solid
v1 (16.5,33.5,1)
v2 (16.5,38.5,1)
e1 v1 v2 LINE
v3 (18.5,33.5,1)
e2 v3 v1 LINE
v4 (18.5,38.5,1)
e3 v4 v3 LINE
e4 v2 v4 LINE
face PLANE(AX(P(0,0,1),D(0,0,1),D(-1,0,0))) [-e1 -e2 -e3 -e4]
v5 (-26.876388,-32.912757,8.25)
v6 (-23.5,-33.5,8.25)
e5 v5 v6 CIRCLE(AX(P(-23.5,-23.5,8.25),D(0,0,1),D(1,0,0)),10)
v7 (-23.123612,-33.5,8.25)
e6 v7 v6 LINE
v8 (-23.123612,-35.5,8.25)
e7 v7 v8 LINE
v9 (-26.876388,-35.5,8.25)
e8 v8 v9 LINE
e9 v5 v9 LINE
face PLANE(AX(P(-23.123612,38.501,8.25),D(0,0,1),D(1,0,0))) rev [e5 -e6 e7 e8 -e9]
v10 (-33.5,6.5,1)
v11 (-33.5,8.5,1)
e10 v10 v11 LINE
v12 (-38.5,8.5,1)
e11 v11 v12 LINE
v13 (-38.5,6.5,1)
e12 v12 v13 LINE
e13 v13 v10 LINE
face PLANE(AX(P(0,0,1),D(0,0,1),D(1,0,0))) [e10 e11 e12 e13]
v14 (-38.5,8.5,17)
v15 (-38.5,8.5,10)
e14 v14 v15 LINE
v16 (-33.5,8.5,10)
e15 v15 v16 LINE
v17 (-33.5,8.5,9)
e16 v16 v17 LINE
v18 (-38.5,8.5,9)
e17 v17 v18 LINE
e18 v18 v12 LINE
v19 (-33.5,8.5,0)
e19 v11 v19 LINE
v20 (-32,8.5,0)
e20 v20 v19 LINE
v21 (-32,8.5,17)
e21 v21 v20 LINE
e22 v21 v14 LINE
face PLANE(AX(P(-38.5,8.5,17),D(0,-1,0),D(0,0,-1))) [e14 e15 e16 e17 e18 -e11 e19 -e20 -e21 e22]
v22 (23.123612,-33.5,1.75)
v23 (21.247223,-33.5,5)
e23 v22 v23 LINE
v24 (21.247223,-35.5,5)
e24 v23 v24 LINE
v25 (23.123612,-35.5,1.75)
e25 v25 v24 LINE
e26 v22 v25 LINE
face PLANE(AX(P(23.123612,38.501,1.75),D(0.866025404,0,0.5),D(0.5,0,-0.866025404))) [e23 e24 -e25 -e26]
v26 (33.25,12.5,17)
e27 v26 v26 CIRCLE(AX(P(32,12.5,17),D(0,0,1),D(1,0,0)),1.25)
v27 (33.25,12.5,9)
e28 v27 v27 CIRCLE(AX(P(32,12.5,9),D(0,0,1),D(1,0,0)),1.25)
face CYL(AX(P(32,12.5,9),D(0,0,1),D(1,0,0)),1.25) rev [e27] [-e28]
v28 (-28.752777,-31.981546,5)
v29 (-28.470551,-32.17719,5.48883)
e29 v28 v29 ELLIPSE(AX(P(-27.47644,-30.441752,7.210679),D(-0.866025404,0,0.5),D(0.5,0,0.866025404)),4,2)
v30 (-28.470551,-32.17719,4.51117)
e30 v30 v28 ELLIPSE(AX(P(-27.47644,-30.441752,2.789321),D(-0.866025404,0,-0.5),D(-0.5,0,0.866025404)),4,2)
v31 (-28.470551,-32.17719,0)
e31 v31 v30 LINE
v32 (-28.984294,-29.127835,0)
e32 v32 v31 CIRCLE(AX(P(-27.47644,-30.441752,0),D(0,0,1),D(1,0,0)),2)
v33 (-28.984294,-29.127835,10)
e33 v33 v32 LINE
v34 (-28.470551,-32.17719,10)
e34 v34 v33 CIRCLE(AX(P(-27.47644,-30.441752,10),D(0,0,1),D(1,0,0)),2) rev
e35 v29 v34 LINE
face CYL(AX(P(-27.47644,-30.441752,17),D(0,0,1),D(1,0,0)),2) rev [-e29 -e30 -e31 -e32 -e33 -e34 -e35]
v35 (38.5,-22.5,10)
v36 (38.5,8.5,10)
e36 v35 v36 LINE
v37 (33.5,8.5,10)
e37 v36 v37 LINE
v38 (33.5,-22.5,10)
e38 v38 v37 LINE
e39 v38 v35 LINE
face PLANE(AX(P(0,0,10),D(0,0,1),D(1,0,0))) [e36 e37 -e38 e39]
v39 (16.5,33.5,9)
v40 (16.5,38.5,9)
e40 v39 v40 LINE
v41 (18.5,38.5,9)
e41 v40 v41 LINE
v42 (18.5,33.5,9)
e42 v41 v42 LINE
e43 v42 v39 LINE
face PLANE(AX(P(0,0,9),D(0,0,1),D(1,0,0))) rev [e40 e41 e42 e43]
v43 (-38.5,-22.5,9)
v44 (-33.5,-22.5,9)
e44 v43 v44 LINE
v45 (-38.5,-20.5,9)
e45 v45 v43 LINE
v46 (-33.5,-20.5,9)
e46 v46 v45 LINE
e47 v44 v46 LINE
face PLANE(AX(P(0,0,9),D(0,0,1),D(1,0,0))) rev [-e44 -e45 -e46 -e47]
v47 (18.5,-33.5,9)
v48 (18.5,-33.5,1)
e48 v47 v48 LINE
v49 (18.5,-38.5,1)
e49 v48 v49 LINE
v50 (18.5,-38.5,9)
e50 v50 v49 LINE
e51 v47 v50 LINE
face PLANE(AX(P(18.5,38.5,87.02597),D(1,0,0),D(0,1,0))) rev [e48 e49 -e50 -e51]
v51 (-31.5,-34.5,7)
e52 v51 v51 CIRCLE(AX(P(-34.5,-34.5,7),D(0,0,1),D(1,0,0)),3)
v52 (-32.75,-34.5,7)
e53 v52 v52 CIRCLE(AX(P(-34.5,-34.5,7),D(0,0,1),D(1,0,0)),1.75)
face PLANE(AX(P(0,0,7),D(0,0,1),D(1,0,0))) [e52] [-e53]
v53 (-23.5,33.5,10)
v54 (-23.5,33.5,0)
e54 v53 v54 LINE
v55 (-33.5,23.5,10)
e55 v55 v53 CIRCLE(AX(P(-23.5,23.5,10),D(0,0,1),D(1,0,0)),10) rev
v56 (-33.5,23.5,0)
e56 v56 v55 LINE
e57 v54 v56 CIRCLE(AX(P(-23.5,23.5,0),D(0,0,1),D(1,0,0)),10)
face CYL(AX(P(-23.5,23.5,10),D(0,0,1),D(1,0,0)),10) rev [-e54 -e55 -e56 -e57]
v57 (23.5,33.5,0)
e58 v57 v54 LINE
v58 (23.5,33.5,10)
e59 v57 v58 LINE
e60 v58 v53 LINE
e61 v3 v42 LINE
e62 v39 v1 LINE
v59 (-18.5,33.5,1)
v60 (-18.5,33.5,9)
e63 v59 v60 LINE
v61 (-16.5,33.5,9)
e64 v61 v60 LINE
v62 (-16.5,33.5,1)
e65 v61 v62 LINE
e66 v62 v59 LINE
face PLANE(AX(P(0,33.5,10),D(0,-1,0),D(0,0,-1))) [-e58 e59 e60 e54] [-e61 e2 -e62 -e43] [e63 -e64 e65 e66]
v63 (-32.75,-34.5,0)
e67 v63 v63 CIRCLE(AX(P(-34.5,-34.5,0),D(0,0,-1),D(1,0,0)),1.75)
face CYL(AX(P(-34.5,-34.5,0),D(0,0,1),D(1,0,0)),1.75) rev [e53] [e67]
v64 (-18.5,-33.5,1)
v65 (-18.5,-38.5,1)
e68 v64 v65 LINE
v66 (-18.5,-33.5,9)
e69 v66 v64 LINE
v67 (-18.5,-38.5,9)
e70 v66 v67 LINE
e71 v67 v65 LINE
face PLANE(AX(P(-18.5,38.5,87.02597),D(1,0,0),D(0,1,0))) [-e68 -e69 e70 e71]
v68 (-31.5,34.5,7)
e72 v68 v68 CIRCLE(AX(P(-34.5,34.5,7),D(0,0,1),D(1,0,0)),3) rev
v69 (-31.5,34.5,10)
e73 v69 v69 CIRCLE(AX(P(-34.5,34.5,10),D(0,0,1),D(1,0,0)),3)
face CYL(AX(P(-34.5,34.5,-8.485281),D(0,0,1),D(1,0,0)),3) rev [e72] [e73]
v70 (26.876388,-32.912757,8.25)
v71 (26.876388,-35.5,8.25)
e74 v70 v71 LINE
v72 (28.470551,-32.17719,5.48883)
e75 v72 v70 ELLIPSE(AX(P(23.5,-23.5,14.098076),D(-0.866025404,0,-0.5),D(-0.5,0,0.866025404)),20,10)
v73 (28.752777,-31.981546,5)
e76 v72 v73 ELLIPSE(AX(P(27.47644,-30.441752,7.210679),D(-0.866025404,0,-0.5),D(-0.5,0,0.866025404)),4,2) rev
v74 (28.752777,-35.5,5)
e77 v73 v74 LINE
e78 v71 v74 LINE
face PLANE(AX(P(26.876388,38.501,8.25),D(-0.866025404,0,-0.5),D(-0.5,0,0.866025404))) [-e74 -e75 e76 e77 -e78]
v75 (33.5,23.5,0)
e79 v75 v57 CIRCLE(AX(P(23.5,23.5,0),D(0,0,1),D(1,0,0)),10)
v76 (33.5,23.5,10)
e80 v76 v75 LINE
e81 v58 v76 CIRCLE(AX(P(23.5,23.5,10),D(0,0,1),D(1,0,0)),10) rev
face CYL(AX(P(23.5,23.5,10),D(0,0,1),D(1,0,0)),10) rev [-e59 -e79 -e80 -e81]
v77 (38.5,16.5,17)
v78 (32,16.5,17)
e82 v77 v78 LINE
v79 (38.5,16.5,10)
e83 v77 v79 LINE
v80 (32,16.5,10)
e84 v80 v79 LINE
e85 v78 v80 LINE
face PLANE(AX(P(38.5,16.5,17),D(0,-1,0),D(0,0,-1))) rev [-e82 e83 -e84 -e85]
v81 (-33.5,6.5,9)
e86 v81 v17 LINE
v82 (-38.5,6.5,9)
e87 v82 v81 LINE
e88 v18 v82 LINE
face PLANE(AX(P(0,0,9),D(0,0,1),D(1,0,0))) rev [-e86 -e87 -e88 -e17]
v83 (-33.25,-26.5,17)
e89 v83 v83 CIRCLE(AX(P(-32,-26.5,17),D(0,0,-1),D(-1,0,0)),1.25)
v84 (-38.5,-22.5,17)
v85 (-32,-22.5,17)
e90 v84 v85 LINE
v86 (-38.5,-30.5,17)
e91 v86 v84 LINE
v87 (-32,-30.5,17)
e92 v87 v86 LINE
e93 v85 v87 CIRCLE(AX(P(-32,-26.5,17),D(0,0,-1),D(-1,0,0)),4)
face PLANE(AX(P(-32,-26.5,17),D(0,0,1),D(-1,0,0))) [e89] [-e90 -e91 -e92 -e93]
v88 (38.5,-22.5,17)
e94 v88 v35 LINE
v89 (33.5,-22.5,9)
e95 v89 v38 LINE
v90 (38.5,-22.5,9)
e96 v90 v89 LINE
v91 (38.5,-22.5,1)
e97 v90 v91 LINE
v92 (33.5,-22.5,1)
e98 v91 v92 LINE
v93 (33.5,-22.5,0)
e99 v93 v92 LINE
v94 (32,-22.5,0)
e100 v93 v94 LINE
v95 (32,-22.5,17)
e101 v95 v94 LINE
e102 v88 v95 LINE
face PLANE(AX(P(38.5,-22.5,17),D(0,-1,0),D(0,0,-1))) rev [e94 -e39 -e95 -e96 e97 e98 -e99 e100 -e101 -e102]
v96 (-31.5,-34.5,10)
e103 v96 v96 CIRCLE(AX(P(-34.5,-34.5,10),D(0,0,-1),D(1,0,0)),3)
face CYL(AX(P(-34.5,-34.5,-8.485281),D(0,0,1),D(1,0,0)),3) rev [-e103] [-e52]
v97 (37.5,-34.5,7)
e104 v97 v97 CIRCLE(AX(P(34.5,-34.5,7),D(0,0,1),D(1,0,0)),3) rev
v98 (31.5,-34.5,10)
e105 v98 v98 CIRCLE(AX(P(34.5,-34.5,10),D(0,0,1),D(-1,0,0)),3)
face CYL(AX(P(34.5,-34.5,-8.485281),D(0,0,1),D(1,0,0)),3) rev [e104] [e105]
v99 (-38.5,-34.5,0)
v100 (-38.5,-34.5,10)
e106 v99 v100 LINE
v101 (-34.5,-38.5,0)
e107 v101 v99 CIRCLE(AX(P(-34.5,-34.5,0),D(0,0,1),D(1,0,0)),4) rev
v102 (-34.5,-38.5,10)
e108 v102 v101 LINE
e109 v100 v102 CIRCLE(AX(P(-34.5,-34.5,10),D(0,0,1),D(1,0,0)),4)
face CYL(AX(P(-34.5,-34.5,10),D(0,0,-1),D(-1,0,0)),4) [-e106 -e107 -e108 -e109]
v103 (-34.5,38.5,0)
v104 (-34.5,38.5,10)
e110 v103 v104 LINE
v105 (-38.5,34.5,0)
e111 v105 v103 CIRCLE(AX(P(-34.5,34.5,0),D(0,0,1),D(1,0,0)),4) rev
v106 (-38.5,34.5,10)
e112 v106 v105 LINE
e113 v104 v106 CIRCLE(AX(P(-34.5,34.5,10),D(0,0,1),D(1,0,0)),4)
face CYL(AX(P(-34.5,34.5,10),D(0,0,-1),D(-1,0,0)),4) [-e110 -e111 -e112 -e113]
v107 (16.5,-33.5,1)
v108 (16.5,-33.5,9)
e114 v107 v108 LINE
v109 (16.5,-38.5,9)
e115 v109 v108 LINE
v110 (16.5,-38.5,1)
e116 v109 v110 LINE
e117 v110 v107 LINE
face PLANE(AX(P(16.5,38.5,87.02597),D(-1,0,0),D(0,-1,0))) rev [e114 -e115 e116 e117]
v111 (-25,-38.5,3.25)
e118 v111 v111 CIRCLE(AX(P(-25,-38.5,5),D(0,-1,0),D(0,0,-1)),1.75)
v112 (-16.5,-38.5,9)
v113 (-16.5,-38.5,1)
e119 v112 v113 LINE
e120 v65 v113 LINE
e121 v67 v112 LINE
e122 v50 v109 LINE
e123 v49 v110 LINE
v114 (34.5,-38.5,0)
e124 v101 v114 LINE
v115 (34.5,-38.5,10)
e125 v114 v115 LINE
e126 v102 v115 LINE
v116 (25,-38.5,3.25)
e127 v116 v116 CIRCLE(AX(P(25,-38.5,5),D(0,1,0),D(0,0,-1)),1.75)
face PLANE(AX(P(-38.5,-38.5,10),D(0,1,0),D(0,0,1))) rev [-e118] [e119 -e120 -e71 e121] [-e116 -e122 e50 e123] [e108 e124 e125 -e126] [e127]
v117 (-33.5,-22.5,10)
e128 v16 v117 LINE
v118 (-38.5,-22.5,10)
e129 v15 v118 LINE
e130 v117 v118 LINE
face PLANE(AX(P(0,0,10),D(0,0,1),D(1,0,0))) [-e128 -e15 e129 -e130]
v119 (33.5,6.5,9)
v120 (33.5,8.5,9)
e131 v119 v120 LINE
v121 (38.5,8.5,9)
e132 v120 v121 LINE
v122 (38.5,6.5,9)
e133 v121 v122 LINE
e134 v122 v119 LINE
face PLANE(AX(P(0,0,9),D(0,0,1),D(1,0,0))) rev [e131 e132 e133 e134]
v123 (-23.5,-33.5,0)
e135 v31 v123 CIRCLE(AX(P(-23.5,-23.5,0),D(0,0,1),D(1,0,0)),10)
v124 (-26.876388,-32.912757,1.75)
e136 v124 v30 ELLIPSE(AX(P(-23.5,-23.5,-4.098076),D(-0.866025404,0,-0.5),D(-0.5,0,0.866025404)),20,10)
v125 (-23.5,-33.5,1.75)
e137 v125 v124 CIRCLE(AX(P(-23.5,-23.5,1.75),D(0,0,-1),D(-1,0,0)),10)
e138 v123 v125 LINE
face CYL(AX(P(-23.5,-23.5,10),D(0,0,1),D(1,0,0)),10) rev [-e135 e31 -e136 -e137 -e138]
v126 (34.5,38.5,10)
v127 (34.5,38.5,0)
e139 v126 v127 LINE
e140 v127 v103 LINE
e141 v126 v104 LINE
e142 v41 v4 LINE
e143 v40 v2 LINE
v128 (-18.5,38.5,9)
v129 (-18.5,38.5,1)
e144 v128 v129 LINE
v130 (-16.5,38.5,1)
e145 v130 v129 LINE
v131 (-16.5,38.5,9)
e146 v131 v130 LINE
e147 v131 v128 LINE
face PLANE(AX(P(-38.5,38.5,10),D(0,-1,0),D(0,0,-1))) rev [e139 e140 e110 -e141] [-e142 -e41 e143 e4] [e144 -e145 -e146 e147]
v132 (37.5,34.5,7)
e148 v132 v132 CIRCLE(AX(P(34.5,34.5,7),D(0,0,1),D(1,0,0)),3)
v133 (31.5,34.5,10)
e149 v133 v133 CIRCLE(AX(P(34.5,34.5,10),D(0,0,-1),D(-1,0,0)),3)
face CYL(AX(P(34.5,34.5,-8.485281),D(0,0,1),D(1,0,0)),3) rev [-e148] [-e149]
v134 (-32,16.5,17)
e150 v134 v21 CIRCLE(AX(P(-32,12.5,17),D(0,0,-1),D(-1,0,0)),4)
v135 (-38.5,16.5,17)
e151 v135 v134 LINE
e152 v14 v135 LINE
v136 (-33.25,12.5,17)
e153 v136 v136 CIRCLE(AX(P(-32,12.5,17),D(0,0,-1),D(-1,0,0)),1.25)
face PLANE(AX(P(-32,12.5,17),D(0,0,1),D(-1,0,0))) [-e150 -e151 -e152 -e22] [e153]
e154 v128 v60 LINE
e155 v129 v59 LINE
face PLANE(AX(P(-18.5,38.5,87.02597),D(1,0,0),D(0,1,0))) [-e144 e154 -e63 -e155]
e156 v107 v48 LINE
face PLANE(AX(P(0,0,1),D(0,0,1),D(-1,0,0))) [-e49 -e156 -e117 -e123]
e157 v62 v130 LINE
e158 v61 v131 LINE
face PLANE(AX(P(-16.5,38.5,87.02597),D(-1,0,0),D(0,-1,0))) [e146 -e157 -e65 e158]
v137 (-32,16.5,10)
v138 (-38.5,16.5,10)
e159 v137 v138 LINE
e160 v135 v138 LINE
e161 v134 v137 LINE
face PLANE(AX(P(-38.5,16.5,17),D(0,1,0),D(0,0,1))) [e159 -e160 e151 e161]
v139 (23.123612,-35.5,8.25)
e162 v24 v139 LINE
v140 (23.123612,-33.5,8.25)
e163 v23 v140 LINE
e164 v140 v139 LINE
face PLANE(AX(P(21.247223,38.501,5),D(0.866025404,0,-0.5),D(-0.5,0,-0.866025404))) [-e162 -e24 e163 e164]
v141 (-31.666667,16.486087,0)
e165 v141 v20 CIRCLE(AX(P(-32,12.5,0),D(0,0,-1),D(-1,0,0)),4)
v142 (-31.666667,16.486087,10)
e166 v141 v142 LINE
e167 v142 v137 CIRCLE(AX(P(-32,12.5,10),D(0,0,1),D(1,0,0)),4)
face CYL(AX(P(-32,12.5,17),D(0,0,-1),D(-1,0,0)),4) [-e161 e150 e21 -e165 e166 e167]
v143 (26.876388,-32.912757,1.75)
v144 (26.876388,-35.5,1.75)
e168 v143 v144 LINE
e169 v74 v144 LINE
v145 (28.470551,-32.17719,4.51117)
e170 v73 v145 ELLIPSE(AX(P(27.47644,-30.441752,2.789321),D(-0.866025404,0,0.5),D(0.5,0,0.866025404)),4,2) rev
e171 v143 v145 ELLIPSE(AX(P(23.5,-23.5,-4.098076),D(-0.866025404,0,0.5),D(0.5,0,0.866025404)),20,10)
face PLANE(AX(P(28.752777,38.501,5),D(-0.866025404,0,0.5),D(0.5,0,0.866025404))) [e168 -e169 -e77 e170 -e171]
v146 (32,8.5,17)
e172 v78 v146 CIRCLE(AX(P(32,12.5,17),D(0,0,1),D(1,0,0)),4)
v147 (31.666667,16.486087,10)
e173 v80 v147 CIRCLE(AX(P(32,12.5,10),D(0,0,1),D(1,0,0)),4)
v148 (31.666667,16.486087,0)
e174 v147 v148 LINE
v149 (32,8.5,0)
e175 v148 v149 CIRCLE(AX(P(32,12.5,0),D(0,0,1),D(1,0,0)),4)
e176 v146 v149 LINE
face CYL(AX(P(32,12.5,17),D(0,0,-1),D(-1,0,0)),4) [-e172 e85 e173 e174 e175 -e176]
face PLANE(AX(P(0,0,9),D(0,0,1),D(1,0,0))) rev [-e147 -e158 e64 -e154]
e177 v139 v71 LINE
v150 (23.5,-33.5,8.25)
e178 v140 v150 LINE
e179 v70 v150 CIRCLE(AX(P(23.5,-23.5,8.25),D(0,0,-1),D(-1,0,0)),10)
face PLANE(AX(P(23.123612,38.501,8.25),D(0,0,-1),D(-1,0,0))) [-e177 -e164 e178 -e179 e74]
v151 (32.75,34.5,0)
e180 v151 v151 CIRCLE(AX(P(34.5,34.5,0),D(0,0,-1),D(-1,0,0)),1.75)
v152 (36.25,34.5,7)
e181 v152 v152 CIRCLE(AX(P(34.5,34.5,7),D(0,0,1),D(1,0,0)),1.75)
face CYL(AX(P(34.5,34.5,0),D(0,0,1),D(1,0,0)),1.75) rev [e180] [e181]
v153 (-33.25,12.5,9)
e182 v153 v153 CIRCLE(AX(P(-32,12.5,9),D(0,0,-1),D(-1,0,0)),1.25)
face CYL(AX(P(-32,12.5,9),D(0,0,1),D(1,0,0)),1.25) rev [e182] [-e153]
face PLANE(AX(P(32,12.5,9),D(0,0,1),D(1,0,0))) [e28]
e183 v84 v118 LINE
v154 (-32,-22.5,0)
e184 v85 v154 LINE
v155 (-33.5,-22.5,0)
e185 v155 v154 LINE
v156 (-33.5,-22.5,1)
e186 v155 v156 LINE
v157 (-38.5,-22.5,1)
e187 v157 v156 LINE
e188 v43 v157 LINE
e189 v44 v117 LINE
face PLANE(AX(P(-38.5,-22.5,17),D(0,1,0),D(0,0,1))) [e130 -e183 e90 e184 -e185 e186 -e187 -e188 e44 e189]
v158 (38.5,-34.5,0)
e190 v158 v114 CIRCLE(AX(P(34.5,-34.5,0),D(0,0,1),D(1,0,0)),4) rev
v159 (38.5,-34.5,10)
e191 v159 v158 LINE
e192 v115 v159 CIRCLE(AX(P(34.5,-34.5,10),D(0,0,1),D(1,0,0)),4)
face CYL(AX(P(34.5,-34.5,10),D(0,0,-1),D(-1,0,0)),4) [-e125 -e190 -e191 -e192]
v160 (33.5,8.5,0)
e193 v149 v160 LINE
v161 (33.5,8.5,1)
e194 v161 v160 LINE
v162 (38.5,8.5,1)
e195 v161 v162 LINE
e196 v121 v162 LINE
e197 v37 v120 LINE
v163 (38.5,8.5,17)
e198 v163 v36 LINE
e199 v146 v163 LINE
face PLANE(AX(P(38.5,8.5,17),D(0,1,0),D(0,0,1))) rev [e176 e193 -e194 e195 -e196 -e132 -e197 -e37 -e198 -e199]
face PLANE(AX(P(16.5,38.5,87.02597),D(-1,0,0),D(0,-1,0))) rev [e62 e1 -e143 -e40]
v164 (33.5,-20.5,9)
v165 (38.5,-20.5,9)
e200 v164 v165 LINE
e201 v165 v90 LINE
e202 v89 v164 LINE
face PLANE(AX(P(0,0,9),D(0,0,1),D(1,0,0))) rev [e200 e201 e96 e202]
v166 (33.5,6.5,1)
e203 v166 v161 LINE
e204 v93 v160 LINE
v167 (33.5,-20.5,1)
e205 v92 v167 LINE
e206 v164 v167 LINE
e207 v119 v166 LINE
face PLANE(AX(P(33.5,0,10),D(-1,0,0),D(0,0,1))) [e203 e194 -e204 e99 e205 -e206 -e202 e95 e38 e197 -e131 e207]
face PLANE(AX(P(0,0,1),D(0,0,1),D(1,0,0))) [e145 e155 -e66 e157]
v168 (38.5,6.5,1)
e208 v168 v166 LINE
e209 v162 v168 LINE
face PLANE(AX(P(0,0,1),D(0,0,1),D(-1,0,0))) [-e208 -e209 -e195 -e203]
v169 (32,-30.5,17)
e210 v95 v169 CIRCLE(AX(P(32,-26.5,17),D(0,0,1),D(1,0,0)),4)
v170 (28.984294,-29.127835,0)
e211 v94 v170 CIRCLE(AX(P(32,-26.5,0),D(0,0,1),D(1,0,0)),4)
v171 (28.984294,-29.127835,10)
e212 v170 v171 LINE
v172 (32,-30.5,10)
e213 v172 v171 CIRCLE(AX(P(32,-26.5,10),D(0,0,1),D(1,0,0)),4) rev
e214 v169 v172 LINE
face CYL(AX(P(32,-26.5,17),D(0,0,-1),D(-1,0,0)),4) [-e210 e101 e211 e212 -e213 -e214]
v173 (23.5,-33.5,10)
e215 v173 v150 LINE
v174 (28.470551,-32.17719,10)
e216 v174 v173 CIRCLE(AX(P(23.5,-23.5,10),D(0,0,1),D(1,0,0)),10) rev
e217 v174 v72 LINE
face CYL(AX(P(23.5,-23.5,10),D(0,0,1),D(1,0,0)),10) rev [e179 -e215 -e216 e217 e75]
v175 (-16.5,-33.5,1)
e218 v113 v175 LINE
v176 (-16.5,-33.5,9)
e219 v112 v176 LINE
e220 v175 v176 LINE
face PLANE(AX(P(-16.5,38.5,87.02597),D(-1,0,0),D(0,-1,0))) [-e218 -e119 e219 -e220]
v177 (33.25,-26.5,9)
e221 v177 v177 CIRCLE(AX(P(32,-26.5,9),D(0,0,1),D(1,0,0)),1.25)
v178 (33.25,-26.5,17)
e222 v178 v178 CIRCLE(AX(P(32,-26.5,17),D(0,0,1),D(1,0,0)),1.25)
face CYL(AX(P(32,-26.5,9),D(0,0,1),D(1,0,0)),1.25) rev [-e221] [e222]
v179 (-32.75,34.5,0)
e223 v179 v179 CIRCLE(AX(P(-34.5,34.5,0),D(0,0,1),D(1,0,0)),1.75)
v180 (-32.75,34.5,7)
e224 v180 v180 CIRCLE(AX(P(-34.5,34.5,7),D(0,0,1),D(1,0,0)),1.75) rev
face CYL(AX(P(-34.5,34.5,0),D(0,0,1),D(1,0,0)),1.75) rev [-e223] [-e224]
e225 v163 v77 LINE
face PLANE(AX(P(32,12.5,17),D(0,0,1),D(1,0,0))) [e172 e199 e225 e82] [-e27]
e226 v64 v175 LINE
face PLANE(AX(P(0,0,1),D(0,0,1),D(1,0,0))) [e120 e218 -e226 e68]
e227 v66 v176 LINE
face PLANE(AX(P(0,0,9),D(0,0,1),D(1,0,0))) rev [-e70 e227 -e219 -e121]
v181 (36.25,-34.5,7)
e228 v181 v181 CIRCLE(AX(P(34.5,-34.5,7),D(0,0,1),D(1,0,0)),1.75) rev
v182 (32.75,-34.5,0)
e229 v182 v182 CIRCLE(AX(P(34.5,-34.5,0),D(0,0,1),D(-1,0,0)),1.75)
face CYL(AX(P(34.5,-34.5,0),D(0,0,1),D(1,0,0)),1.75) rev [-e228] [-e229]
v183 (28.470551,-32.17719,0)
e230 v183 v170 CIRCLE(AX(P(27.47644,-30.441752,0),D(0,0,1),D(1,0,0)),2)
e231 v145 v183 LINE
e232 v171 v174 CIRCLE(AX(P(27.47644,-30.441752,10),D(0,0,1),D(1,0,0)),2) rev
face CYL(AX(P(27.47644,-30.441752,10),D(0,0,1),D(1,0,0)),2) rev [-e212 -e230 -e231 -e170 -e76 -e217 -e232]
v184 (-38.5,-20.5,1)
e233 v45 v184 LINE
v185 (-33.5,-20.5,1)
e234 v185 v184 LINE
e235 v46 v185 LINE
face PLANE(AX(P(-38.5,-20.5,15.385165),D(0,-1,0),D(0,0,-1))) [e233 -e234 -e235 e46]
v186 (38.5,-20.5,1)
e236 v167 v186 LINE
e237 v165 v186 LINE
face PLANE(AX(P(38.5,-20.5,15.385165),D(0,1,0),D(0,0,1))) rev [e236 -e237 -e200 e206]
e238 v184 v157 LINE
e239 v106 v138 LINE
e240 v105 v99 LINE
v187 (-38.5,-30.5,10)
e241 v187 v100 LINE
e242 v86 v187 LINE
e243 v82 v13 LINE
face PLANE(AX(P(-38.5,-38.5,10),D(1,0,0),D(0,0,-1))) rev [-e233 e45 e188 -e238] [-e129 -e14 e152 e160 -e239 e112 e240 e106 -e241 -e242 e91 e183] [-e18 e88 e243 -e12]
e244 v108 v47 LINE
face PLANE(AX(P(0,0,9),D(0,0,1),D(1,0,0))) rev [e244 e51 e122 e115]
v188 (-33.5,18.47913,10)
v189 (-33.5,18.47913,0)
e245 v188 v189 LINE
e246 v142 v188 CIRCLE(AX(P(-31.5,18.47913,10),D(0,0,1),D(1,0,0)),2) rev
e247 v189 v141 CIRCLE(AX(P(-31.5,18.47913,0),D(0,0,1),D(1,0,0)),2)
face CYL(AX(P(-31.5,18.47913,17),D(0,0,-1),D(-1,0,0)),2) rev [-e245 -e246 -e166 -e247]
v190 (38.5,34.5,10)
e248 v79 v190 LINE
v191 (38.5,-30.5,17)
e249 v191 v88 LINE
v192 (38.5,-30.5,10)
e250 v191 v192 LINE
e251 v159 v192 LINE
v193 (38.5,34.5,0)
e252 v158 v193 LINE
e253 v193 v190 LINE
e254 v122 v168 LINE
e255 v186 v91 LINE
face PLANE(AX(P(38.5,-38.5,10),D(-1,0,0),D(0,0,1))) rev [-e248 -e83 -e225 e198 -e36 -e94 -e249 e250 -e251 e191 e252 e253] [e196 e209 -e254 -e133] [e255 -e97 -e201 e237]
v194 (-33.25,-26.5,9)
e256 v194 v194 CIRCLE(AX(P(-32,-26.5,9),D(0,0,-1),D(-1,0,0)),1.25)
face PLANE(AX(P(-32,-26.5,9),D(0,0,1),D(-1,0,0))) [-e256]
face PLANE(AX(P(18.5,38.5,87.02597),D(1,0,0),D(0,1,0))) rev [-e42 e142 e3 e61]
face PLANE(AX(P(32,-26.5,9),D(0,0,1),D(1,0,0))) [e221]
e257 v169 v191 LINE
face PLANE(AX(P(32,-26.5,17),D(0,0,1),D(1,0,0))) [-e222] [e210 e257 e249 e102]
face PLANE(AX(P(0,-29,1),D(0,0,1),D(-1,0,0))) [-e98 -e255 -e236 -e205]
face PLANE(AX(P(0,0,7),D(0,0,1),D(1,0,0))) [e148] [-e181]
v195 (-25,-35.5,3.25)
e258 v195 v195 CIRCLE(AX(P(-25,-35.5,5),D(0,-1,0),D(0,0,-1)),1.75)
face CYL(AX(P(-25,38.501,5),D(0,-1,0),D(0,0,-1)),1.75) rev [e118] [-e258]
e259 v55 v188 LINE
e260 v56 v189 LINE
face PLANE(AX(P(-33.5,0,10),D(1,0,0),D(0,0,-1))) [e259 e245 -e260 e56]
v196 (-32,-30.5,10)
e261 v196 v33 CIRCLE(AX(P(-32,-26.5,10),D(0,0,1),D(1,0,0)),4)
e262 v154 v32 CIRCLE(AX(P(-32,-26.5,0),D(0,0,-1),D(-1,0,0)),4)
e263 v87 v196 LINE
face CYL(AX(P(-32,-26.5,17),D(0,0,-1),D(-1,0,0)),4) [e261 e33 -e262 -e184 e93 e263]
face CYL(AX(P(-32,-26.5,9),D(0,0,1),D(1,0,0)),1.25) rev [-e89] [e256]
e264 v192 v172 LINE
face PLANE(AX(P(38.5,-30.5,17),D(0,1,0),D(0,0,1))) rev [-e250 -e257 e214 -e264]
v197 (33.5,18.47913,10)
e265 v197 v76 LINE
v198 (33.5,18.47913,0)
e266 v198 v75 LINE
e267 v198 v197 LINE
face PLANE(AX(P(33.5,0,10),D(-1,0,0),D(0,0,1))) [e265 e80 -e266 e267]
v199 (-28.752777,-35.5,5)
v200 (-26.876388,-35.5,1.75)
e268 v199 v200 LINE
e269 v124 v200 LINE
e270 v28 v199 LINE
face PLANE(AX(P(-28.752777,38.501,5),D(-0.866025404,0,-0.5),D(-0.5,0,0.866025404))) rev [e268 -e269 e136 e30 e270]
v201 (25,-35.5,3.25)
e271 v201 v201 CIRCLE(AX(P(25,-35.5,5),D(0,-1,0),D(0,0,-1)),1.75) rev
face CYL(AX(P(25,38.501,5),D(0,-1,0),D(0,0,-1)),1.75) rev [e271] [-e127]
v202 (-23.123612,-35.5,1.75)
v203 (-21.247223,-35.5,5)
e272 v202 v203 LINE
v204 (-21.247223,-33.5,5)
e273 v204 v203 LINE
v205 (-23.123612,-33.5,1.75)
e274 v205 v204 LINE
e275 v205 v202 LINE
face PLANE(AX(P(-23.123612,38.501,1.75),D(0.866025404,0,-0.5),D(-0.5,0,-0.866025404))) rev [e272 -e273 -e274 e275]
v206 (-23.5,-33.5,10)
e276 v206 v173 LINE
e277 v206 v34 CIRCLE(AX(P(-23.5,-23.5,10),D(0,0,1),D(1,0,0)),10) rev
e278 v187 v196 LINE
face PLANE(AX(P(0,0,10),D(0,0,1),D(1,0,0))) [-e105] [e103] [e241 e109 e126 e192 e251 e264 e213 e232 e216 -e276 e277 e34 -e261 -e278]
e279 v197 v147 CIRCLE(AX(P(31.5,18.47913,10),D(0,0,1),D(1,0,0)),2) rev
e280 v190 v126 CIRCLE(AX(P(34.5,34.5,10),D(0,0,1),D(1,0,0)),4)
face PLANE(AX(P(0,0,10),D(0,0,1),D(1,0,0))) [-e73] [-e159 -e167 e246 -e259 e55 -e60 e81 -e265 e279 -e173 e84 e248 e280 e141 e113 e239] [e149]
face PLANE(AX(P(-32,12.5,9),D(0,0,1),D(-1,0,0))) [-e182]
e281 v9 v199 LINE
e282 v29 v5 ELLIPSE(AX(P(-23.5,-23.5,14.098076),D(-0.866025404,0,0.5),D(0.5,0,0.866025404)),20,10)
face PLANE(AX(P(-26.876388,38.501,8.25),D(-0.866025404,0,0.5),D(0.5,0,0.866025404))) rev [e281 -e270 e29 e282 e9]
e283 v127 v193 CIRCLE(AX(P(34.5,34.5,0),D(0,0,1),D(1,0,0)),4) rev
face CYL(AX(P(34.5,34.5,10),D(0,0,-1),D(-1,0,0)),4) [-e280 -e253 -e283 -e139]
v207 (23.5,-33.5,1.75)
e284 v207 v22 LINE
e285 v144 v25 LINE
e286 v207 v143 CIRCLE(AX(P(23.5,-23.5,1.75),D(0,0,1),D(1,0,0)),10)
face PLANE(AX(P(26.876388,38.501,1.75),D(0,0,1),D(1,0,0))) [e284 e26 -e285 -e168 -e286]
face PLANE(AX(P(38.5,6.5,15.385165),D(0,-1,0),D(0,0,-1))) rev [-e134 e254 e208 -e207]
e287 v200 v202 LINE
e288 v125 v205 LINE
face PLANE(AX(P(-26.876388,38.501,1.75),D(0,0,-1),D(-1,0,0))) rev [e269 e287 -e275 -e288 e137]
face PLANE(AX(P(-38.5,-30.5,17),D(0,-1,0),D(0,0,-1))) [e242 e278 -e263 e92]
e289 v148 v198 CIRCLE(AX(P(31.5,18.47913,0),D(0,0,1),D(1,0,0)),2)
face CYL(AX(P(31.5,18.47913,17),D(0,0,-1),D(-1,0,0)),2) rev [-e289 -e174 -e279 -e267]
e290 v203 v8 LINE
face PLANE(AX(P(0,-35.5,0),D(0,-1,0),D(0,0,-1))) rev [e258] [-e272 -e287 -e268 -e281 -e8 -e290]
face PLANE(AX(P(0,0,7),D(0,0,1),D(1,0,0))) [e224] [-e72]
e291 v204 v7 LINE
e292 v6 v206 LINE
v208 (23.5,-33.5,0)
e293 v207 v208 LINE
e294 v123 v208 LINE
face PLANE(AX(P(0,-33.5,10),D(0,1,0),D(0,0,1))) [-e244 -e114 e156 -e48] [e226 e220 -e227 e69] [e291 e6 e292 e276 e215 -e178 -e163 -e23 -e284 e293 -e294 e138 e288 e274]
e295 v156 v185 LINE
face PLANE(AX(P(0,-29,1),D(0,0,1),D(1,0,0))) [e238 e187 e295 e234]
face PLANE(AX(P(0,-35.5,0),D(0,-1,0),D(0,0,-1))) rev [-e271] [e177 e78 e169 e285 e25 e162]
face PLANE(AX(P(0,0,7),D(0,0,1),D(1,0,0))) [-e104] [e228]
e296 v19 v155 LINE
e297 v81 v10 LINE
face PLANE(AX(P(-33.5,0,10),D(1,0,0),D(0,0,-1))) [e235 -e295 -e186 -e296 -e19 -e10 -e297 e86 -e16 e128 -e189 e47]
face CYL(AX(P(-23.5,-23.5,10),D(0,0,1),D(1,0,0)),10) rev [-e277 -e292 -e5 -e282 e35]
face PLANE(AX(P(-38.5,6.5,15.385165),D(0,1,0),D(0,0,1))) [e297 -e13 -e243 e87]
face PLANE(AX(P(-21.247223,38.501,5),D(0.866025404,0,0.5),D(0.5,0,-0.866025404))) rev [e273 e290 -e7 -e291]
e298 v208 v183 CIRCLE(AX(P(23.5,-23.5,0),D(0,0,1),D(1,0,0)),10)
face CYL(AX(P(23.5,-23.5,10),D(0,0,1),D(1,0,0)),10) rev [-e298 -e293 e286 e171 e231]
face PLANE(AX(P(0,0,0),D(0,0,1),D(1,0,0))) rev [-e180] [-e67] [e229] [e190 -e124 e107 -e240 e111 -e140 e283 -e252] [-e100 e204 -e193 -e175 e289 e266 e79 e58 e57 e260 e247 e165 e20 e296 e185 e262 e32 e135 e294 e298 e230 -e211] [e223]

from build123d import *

# Parameters (mm, degrees)
SKETCH1_W               = 77
SKETCH1_H               = 77
SKETCH1_W_2             = 67
SKETCH1_H_2             = 67
EXTRUDE_THIN1_DEPTH     = 10
FILLET2_R               = 10
FILLET1_R               = 4
SKETCH2_R               = 1.7500000000000038
CUT_EXTRUDE1_DEPTH      = 56.35792626173781
SKETCH3_R               = 3.0000000000000018
CUT_EXTRUDE2_DEPTH      = 3
MIRROR2_COPY_1_SKETCH_R = 1.7500000000000038
MIRROR2_COPY_1_DEPTH    = 56.35792626173781
MIRROR2_COPY_2_SKETCH_R = 3.0000000000000018
MIRROR2_COPY_2_DEPTH    = 3
BOSS_EXTRUDE2_DEPTH     = 17
SKETCH5_R               = 1.2499999999999978
CUT_EXTRUDE3_DEPTH      = 8
LPATTERN1_COUNT         = 2
LPATTERN1_PITCH         = 39
MIRROR3_COPY_1_DEPTH    = 17
MIRROR3_COPY_2_SKETCH_R = 1.2499999999999978
MIRROR3_COPY_2_DEPTH    = 8
CUT_EXTRUDE6_REACH      = 89.751
SKETCH9_R               = 1.7500000000000002
CUT_EXTRUDE7_REACH      = 92.751
CUT_EXTRUDE7_START      = -3
CUT_EXTRUDE8_START      = 1
SKETCH11_W              = 4.999999999999986
SKETCH11_H              = 1.9999999999999991
CUT_EXTRUDE8_DEPTH      = 8
LPATTERN2_COUNT         = 2
LPATTERN2_PITCH         = 29
MIRROR5_START           = 1
MIRROR5_COPY_1_SKETCH_W = 4.999999999999986
MIRROR5_COPY_1_SKETCH_H = 1.9999999999999991
MIRROR5_COPY_1_DEPTH    = 8
CUT_EXTRUDE9_START      = 1
CUT_EXTRUDE9_DEPTH      = 8
FILLET3_R               = 2
FILLET4_R               = 2


with BuildPart() as part:
    # Sketch1 → Extrude-Thin1 (new body)
    with BuildSketch(Plane.XY):
        Rectangle(SKETCH1_W, SKETCH1_H)
        Rectangle(SKETCH1_W_2, SKETCH1_H_2, mode=Mode.SUBTRACT)
    extrude(amount=EXTRUDE_THIN1_DEPTH)

    # Fillet2
    fillet2_edges = [part.edges().sort_by_distance(p)[0] for p in [
        (33.49999999999999, -33.50000000000001, 5),
        (33.49999999999999, 33.49999999999999, 5),
        (-33.50000000000001, 33.49999999999999, 5),
        (-33.50000000000001, -33.50000000000001, 5),
    ]]
    fillet(fillet2_edges, radius=FILLET2_R)

    # Fillet1
    fillet1_edges = [part.edges().sort_by_distance(p)[0] for p in [
        (38.49999999999999, -38.50000000000001, 5),
        (-38.50000000000001, -38.50000000000001, 5),
        (-38.50000000000001, 38.49999999999999, 5),
        (38.49999999999999, 38.49999999999999, 5),
    ]]
    fillet(fillet1_edges, radius=FILLET1_R)

    # Sketch2 → Cut-Extrude1 (cut, through all)
    with BuildSketch(Plane.XY.offset(10)):
        with Locations((-34.5, 34.499999999999986)):
            Circle(SKETCH2_R)
    cut_extrude1 = extrude(amount=-CUT_EXTRUDE1_DEPTH, mode=Mode.SUBTRACT)

    # Sketch3 → Cut-Extrude2 (cut)
    with BuildSketch(Plane.XY.offset(10)):
        with Locations((-34.5, 34.499999999999986)):
            Circle(SKETCH3_R)
    cut_extrude2 = extrude(amount=-CUT_EXTRUDE2_DEPTH, mode=Mode.SUBTRACT)

    # Mirror1: Cut-Extrude1, Cut-Extrude2 across plane
    add(cut_extrude1.mirror(Plane(origin=(0, 0, 0), x_dir=(0, 0, 1), z_dir=(1, 0, 0))), mode=Mode.SUBTRACT)
    add(cut_extrude2.mirror(Plane(origin=(0, 0, 0), x_dir=(0, 0, 1), z_dir=(1, 0, 0))), mode=Mode.SUBTRACT)

    # Mirror2: Cut-Extrude1, Cut-Extrude2 across plane
    add(cut_extrude1.mirror(Plane.ZX), mode=Mode.SUBTRACT)
    add(cut_extrude2.mirror(Plane.ZX), mode=Mode.SUBTRACT)

    # Mirror2 copy 1 sketch → Mirror2 copy 1 (cut, through all)
    with BuildSketch(Plane(origin=(0, 0, 10), x_dir=(-1, 0, 0), z_dir=(0, 0, 1))):
        with Locations((-34.5, 34.499999999999986)):
            Circle(MIRROR2_COPY_1_SKETCH_R)
    extrude(amount=-MIRROR2_COPY_1_DEPTH, mode=Mode.SUBTRACT)

    # Mirror2 copy 2 sketch → Mirror2 copy 2 (cut)
    with BuildSketch(Plane(origin=(0, 0, 10), x_dir=(-1, 0, 0), z_dir=(0, 0, 1))):
        with Locations((-34.5, 34.499999999999986)):
            Circle(MIRROR2_COPY_2_SKETCH_R)
    extrude(amount=-MIRROR2_COPY_2_DEPTH, mode=Mode.SUBTRACT)

    # Sketch4 → Boss-Extrude2 (add)
    with BuildSketch(Plane.XY):
        with BuildLine():
            Line((38.49999999999999, -30.500000000000007), (32, -30.500000000000007))
            ThreePointArc((32, -30.500000000000007), (28, -26.500000000000007), (32, -22.500000000000007))
            Line((32, -22.500000000000007), (38.49999999999999, -22.500000000000007))
            Line((38.49999999999999, -22.500000000000007), (38.49999999999999, -30.500000000000007))
        make_face()
    boss_extrude2 = extrude(amount=BOSS_EXTRUDE2_DEPTH)

    # Sketch5 → Cut-Extrude3 (cut)
    with BuildSketch(Plane.XY.offset(17)):
        with Locations((32, -26.500000000000007)):
            Circle(SKETCH5_R)
    cut_extrude3 = extrude(amount=-CUT_EXTRUDE3_DEPTH, mode=Mode.SUBTRACT)

    # LPattern1: Boss-Extrude2, Cut-Extrude3 ×2
    with Locations(*[(0, i * LPATTERN1_PITCH, 0) for i in range(1, LPATTERN1_COUNT)]):
        add(boss_extrude2)
        add(cut_extrude3, mode=Mode.SUBTRACT)

    # Mirror3: Boss-Extrude2, Cut-Extrude3 across plane
    add(boss_extrude2.mirror(Plane(origin=(0, 0, 0), x_dir=(0, 0, 1), z_dir=(1, 0, 0))))
    add(cut_extrude3.mirror(Plane(origin=(0, 0, 0), x_dir=(0, 0, 1), z_dir=(1, 0, 0))), mode=Mode.SUBTRACT)

    # Mirror3 copy 1 sketch → Mirror3 copy 1 (add)
    with BuildSketch(Plane(origin=(0, 39, 0), x_dir=(-1, 0, 0), z_dir=(0, 0, 1))):
        with BuildLine():
            Line((38.49999999999999, 30.500000000000007), (32, 30.500000000000007))
            ThreePointArc((32, 30.500000000000007), (28, 26.500000000000007), (32, 22.500000000000007))
            Line((32, 22.500000000000007), (38.49999999999999, 22.500000000000007))
            Line((38.49999999999999, 22.500000000000007), (38.49999999999999, 30.500000000000007))
        make_face()
    extrude(amount=MIRROR3_COPY_1_DEPTH)

    # Mirror3 copy 2 sketch → Mirror3 copy 2 (cut)
    with BuildSketch(Plane(origin=(0, 39, 17), x_dir=(-1, 0, 0), z_dir=(0, 0, 1))):
        with Locations((32, 26.500000000000007)):
            Circle(MIRROR3_COPY_2_SKETCH_R)
    extrude(amount=-MIRROR3_COPY_2_DEPTH, mode=Mode.SUBTRACT)

    # Sketch9 → Cut-Extrude6 (cut, up to next)
    with BuildSketch(Plane.XZ.offset(38.50000000000001), mode=Mode.PRIVATE) as cut_extrude6_sk1:
        with Locations(Location((-25, 5.000000000000001, 0), (0, 0, 270))):
            Circle(SKETCH9_R)
    cut_extrude6_tool1 = extrude(cut_extrude6_sk1.sketch, amount=-CUT_EXTRUDE6_REACH, mode=Mode.PRIVATE) & part.part
    cut_extrude6 = cut_extrude6_tool1.solids().sort_by_distance((-25, -38.5, 5))[0]
    add(cut_extrude6, mode=Mode.SUBTRACT)

    # Sketch10 → Cut-Extrude7 (cut, up to next)
    with BuildSketch(Plane.XZ.offset(38.50000000000001).offset(CUT_EXTRUDE7_START), mode=Mode.PRIVATE) as cut_extrude7_sk1:
        Polygon((-21.247223250267435, 4.999999999999997), (-23.123611625133723, 8.250000000000002), (-26.876388374866284, 8.250000000000002), (-28.75277674973257, 5.000000000000003), (-26.876388374866284, 1.7500000000000024), (-23.123611625133716, 1.7500000000000024), align=None)
    cut_extrude7_tool1 = extrude(cut_extrude7_sk1.sketch, amount=-CUT_EXTRUDE7_REACH, mode=Mode.PRIVATE) & part.part
    cut_extrude7 = cut_extrude7_tool1.solids().sort_by_distance((-25, -35.5, 5))[0]
    add(cut_extrude7, mode=Mode.SUBTRACT)

    # Mirror4: Cut-Extrude6, Cut-Extrude7 across plane
    add(cut_extrude6.mirror(Plane(origin=(0, 0, 0), x_dir=(0, 0, 1), z_dir=(1, 0, 0))), mode=Mode.SUBTRACT)
    add(cut_extrude7.mirror(Plane(origin=(0, 0, 0), x_dir=(0, 0, 1), z_dir=(1, 0, 0))), mode=Mode.SUBTRACT)

    # Sketch11 → Cut-Extrude8 (cut)
    with BuildSketch(Plane.XY.offset(CUT_EXTRUDE8_START)):
        with Locations((-36, 7.499999999999993)):
            Rectangle(SKETCH11_W, SKETCH11_H)
    cut_extrude8 = extrude(amount=CUT_EXTRUDE8_DEPTH, mode=Mode.SUBTRACT)

    # LPattern2: Cut-Extrude8 ×2
    with Locations(*[(0, -i * LPATTERN2_PITCH, 0) for i in range(1, LPATTERN2_COUNT)]):
        add(cut_extrude8, mode=Mode.SUBTRACT)

    # Mirror5: Cut-Extrude8 across plane
    add(cut_extrude8.mirror(Plane(origin=(0, 0, 0), x_dir=(0, 0, 1), z_dir=(1, 0, 0))), mode=Mode.SUBTRACT)

    # Mirror5 copy 1 sketch → Mirror5 copy 1 (cut)
    with BuildSketch(Plane(origin=(0, -29, 0), x_dir=(-1, 0, 0), z_dir=(0, 0, 1)).offset(MIRROR5_START)):
        with Locations((-36, -7.499999999999993)):
            Rectangle(MIRROR5_COPY_1_SKETCH_W, MIRROR5_COPY_1_SKETCH_H)
    extrude(amount=MIRROR5_COPY_1_DEPTH, mode=Mode.SUBTRACT)

    # Sketch12 → Cut-Extrude9 (cut)
    with BuildSketch(Plane.XY.offset(CUT_EXTRUDE9_START)):
        Polygon((-18.500000000000004, 38.49999999999999), (-16.5, 38.49999999999999), (-16.49999999999999, -38.50000000000001), (-18.499999999999993, -38.50000000000001), align=None)
    cut_extrude9 = extrude(amount=CUT_EXTRUDE9_DEPTH, mode=Mode.SUBTRACT)

    # Fillet3
    # the kernel refuses this fillet: 2 mm, written as the material it adds along each edge
    with BuildSketch(Plane(origin=(-30.8135340936457, -30.319986734670543, 0), x_dir=(0.7836645643351602, -0.6211842324185182, 0), z_dir=(0, 0, 1))) as fillet3_piece_1_section:
        with BuildLine():
            CenterArc((2.6908007118595028, 1.9775267990850256), FILLET3_R, 177.3343308383769, 101.26297954603814)
            ThreePointArc((0.6929648694973664, 2.0705426416774246), (0.49049353406767626, 0.9870739881023467), (0, 0))
            ThreePointArc((0, 0), (1.4948892843663875, -0.1123660045748809), (2.9897785687327803, -7e-17))
        make_face()
    fillet3_piece_1 = extrude(amount=10, mode=Mode.PRIVATE)
    fillet3_piece_1 = split(fillet3_piece_1, bisect_by=Plane(origin=(-27.54913565092657, -30.645363092705114, 2.915232462789981), z_dir=(-0.8660254037844386, 0, -0.5000000000000001)), keep=Keep.TOP, mode=Mode.PRIVATE)
    fillet3_piece_1 = split(fillet3_piece_1, bisect_by=Plane(origin=(-30.43600370177841, -30.645363092705114, 2.084565398387304), z_dir=(0.8660254037844387, 0, -0.5000000000000003)), keep=Keep.TOP, mode=Mode.PRIVATE)
    add(fillet3_piece_1)
    with BuildSketch(Plane(origin=(-30.8135340936457, -30.319986734670543, 0), x_dir=(0.7836645643351602, -0.6211842324185182, 0), z_dir=(0, 0, 1))) as fillet3_piece_2_section:
        with BuildLine():
            CenterArc((2.6908007118595028, 1.9775267990850256), FILLET3_R, 177.3343308383769, 101.26297954603814)
            ThreePointArc((0.6929648694973664, 2.0705426416774246), (0.49049353406767626, 0.9870739881023467), (0, 0))
            ThreePointArc((0, 0), (1.4948892843663875, -0.1123660045748809), (2.9897785687327803, -7e-17))
        make_face()
    fillet3_piece_2 = extrude(amount=10, mode=Mode.PRIVATE)
    fillet3_piece_2 = split(fillet3_piece_2, bisect_by=Plane(origin=(-29.05636390138043, -30.536998360213005, 5.525828371179215), z_dir=(-0.8660254037844386, 0, -0.5000000000000001)), keep=Keep.TOP, mode=Mode.PRIVATE)
    fillet3_piece_2 = split(fillet3_piece_2, bisect_by=Plane(origin=(-29.056363901380575, -30.536998360213005, 4.474171628820541), z_dir=(-0.8660254037844387, 0, 0.5000000000000003)), keep=Keep.TOP, mode=Mode.PRIVATE)
    add(fillet3_piece_2)
    with BuildSketch(Plane(origin=(-30.8135340936457, -30.319986734670543, 0), x_dir=(0.7836645643351602, -0.6211842324185182, 0), z_dir=(0, 0, 1))) as fillet3_piece_3_section:
        with BuildLine():
            CenterArc((2.6908007118595028, 1.9775267990850256), FILLET3_R, 177.3343308383769, 101.26297954603814)
            ThreePointArc((0.6929648694973664, 2.0705426416774246), (0.49049353406767626, 0.9870739881023467), (0, 0))
            ThreePointArc((0, 0), (1.4948892843663875, -0.1123660045748809), (2.9897785687327803, -7e-17))
        make_face()
    fillet3_piece_3 = extrude(amount=10, mode=Mode.PRIVATE)
    fillet3_piece_3 = split(fillet3_piece_3, bisect_by=Plane(origin=(-30.436003701778844, -30.6453630927051, 7.915434601613452), z_dir=(0.8660254037844386, 0, 0.5000000000000001)), keep=Keep.TOP, mode=Mode.PRIVATE)
    fillet3_piece_3 = split(fillet3_piece_3, bisect_by=Plane(origin=(-27.54913565092623, -30.6453630927051, 7.084767537210608), z_dir=(-0.8660254037844387, 0, 0.5000000000000003)), keep=Keep.TOP, mode=Mode.PRIVATE)
    add(fillet3_piece_3)
    with BuildSketch(Plane(origin=(30.813534093645686, -30.31998673467054, 0), x_dir=(-0.8377846693209525, 0.5460007764195783, 0), z_dir=(0, 0, 1))) as fillet3_piece_4_section:
        with BuildLine():
            CenterArc((2.729281940067415, 1.9240688146905967), FILLET3_R, 152.89843442949885, 101.2629795460382)
            ThreePointArc((0.9488812264558188, 2.835207277807654), (0.3678839212773398, 1.4532658091220572), (0, 0))
            ThreePointArc((0, 0), (1.091712776026968, 0.15186237061880967), (2.183425552053934, 1.9e-16))
        make_face()
    fillet3_piece_4 = extrude(amount=10, mode=Mode.PRIVATE)
    fillet3_piece_4 = split(fillet3_piece_4, bisect_by=Plane(origin=(30.436003705842438, -30.64536309093321, 2.084565391348203), z_dir=(-0.8660254037844386, 0, -0.5000000000000003)), keep=Keep.TOP, mode=Mode.PRIVATE)
    fillet3_piece_4 = split(fillet3_piece_4, bisect_by=Plane(origin=(27.549135647094026, -30.64536309093321, 2.915232456151825), z_dir=(0.8660254037844386, 0, -0.5000000000000001)), keep=Keep.TOP, mode=Mode.PRIVATE)
    add(fillet3_piece_4)
    with BuildSketch(Plane(origin=(30.813534093645686, -30.31998673467054, 0), x_dir=(-0.8377846693209525, 0.5460007764195783, 0), z_dir=(0, 0, 1))) as fillet3_piece_5_section:
        with BuildLine():
            CenterArc((2.729281940067415, 1.9240688146905967), FILLET3_R, 152.89843442949885, 101.2629795460382)
            ThreePointArc((0.9488812264558188, 2.835207277807654), (0.3678839212773398, 1.4532658091220572), (0, 0))
            ThreePointArc((0, 0), (1.091712776026968, 0.15186237061880967), (2.183425552053934, 1.9e-16))
        make_face()
    fillet3_piece_5 = extrude(amount=10, mode=Mode.PRIVATE)
    fillet3_piece_5 = split(fillet3_piece_5, bisect_by=Plane(origin=(29.056363901218514, -30.53699836176434, 4.474171629101236), z_dir=(0.8660254037844386, 0, 0.5000000000000003)), keep=Keep.TOP, mode=Mode.PRIVATE)
    fillet3_piece_5 = split(fillet3_piece_5, bisect_by=Plane(origin=(29.05636390121846, -30.53699836176434, 5.525828370898675), z_dir=(0.8660254037844386, 0, -0.5000000000000001)), keep=Keep.TOP, mode=Mode.PRIVATE)
    add(fillet3_piece_5)
    with BuildSketch(Plane(origin=(30.813534093645686, -30.31998673467054, 0), x_dir=(-0.8377846693209525, 0.5460007764195783, 0), z_dir=(0, 0, 1))) as fillet3_piece_6_section:
        with BuildLine():
            CenterArc((2.729281940067415, 1.9240688146905967), FILLET3_R, 152.89843442949885, 101.2629795460382)
            ThreePointArc((0.9488812264558188, 2.835207277807654), (0.3678839212773398, 1.4532658091220572), (0, 0))
            ThreePointArc((0, 0), (1.091712776026968, 0.15186237061880967), (2.183425552053934, 1.9e-16))
        make_face()
    fillet3_piece_6 = extrude(amount=10, mode=Mode.PRIVATE)
    fillet3_piece_6 = split(fillet3_piece_6, bisect_by=Plane(origin=(27.549135647093944, -30.64536309093318, 7.084767543848323), z_dir=(0.8660254037844386, 0, 0.5000000000000003)), keep=Keep.TOP, mode=Mode.PRIVATE)
    fillet3_piece_6 = split(fillet3_piece_6, bisect_by=Plane(origin=(30.436003705842538, -30.64536309093318, 7.9154346086519745), z_dir=(-0.8660254037844386, 0, 0.5000000000000001)), keep=Keep.TOP, mode=Mode.PRIVATE)
    add(fillet3_piece_6)

    # Fillet4
    # the kernel refuses this fillet: 2 mm, written as the material it adds along each edge
    with BuildSketch(Plane(origin=(33.49999999999999, 16.499999999999993, 10), x_dir=(0, 1, 0), z_dir=(0, 0, -1))) as fillet4_piece_1:
        with BuildLine():
            CenterArc((1.9791303715507027, -2), FILLET4_R, 90, 85.21980815280071)
            Line((-0.01391308563286486, -1.8333333333333286), (-0.21321743135122162, -1.8166666666666629))
            ThreePointArc((-0.21321743135122162, -1.8166666666666629), (-0.1999999999999993, -1.499999999999993), (-0.1999999999999993, 0))
            Line((-0.1999999999999993, 0), (0, 0.20000000000000284))
            Line((0, 0.20000000000000284), (1.9791303715507027, 0.20000000000000284))
            Line((1.9791303715507027, 0.20000000000000284), (1.9791303715507027, 0))
        make_face()
    extrude(amount=10)
    with BuildSketch(Plane(origin=(-33.50000000000001, 16.499999999999993, 10), x_dir=(0.9999712051187002, -0.0075887372766649565, 0), z_dir=(0, 0, -1))) as fillet4_piece_2:
        with BuildLine():
            CenterArc((1.9849233098114338, -1.9942508572799034), FILLET4_R, 94.34538505600126, 85.21980815280081)
            Line((-0.01501910042596653, -1.9790733827265699), (-0.2150133414497094, -1.977555635271237))
            Line((-0.2150133414497094, -1.977555635271237), (-0.19999424102374289, 0.00151774745533301))
            Line((-0.19999424102374289, 0.00151774745533301), (0.00151774745533299, 0.19999424102373933))
            ThreePointArc((0.00151774745533299, 0.19999424102373933), (1.5014745551333903, 0.18861113510874183), (1.8182324070349718, 0.19942508572799034))
            Line((1.8182324070349718, 0.19942508572799034), (1.833386125469195, 0))
        make_face()
    extrude(amount=10)

    # Mirror6: Cut-Extrude9 across plane
    add(cut_extrude9.mirror(Plane(origin=(0, 0, 0), x_dir=(0, 0, 1), z_dir=(1, 0, 0))), mode=Mode.SUBTRACT)


solid = part.part
